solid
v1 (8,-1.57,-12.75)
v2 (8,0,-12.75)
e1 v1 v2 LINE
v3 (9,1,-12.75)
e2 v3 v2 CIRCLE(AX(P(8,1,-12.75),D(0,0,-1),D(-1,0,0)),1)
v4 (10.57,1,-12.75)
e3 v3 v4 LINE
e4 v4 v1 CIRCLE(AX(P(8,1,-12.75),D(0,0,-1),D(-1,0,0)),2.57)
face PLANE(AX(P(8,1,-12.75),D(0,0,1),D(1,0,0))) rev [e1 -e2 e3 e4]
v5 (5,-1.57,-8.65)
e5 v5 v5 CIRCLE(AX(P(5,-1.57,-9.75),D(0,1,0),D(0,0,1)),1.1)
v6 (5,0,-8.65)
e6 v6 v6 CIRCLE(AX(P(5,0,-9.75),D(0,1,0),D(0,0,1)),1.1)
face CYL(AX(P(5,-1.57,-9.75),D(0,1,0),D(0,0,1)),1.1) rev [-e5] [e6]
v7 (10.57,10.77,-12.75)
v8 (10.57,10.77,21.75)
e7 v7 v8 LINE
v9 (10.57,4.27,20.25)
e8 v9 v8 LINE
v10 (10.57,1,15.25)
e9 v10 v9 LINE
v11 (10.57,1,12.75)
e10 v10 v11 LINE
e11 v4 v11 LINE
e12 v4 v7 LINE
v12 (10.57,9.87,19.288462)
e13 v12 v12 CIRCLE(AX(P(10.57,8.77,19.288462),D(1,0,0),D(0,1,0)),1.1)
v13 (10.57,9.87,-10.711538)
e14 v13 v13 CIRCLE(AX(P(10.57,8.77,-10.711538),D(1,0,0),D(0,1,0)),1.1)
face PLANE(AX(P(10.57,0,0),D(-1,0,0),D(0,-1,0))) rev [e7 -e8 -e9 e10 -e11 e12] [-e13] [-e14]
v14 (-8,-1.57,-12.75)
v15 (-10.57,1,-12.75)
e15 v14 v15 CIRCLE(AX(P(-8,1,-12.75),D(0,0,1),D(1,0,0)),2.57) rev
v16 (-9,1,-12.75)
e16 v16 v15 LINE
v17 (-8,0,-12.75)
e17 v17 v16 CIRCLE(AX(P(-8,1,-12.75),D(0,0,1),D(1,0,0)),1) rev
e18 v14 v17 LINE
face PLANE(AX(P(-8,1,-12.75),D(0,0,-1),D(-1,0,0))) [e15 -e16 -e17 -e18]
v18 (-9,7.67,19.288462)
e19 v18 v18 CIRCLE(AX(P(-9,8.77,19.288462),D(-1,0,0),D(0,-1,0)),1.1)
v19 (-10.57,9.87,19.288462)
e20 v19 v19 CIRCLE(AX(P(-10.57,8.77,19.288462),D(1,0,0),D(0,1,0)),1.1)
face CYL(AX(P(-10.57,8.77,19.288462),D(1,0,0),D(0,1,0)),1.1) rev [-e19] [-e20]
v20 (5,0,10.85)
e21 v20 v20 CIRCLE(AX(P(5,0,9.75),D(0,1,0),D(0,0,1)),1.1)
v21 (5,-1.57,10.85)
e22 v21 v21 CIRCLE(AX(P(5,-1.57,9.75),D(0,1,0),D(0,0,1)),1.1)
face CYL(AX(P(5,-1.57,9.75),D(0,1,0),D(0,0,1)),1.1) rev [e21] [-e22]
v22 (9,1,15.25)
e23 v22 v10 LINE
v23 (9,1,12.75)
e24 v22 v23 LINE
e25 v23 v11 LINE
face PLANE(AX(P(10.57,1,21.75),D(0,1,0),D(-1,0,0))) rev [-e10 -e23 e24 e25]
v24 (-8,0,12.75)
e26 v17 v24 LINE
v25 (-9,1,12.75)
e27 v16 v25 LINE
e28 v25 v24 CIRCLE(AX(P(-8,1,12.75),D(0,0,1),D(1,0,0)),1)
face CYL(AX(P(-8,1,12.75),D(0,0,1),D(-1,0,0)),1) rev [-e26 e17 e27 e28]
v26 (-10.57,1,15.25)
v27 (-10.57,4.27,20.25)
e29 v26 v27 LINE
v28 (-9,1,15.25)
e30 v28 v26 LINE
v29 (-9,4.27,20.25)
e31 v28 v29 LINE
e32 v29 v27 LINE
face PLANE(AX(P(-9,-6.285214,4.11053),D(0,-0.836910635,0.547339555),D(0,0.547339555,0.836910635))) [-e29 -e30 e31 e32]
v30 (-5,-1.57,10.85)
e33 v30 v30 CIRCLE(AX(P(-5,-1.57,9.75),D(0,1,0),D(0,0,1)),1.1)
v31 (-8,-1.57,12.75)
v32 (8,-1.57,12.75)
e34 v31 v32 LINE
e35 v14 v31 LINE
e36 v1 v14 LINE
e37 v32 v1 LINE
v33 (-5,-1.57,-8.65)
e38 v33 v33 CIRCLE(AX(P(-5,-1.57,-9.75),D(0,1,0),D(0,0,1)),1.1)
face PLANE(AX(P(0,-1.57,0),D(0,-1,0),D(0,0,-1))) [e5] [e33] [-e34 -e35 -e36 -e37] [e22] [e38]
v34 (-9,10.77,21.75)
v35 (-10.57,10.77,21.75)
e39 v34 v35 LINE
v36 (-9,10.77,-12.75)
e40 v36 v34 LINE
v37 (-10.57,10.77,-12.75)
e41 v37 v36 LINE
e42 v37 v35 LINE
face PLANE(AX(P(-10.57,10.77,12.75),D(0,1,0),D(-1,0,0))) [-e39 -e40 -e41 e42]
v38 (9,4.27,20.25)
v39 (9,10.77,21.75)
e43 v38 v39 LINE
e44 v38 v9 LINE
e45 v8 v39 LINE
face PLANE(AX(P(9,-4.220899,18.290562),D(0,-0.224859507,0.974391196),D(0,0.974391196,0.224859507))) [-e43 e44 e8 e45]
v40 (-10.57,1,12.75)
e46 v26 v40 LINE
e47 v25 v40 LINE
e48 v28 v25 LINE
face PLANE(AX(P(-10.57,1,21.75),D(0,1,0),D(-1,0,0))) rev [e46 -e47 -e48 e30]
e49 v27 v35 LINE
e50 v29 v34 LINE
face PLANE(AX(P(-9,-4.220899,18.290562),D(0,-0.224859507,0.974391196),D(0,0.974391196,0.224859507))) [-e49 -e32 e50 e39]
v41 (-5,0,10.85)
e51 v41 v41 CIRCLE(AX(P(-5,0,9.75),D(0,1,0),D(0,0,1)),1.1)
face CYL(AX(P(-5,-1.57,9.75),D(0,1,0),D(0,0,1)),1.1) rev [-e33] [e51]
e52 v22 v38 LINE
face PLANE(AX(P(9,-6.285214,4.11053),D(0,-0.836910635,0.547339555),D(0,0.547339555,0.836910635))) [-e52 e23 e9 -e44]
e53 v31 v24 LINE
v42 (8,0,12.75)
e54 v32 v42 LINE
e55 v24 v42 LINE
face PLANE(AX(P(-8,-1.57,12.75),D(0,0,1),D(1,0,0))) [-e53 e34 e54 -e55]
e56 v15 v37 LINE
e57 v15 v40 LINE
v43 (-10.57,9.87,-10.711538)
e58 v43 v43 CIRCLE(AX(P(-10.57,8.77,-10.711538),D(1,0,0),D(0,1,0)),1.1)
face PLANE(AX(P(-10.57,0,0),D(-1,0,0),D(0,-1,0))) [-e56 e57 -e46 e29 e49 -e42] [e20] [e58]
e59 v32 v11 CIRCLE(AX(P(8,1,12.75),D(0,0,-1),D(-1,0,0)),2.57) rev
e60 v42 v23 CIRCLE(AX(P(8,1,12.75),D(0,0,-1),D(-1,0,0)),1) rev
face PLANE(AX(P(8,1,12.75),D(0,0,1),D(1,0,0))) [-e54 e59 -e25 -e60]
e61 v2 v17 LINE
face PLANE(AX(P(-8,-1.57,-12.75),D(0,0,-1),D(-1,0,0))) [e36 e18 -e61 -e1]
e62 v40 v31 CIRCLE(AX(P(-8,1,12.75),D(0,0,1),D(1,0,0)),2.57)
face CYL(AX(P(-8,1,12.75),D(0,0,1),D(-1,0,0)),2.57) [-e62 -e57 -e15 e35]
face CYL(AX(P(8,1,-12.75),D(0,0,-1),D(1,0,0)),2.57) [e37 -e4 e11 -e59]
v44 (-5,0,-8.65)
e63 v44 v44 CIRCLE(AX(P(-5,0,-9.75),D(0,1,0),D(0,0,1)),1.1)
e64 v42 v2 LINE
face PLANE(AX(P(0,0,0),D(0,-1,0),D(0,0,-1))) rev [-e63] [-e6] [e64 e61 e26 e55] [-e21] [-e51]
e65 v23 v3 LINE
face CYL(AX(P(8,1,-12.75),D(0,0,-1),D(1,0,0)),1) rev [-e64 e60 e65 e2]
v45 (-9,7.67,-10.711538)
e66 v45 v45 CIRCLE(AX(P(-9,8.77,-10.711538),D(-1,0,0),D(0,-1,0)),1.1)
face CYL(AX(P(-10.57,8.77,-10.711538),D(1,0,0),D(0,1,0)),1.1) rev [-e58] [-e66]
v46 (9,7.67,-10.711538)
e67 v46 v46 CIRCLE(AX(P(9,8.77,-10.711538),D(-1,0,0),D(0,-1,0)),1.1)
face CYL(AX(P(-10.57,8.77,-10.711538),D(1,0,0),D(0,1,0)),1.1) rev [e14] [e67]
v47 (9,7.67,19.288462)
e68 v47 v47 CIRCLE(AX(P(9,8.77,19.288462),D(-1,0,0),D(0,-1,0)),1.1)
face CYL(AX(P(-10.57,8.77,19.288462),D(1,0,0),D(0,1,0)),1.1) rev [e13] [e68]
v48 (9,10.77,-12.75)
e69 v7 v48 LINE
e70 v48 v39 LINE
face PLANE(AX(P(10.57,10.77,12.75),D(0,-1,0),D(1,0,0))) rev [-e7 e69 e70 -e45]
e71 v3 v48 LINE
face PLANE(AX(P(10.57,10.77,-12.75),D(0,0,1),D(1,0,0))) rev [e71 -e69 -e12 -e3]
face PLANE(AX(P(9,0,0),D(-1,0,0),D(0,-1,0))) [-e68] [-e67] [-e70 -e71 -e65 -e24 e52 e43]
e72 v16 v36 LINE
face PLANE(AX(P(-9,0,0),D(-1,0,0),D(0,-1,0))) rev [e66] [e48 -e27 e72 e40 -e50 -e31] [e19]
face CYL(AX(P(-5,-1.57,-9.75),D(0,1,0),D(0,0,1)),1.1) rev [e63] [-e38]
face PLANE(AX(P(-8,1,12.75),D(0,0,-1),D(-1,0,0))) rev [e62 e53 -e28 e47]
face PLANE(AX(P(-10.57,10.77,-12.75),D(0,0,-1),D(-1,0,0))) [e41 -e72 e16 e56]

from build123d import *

# Parameters (mm, degrees)
SKETCH1_W           = 16
SKETCH1_H           = 25.5
SKETCH1_R           = 1.1
BASE_FLANGE1_DEPTH  = 1.57
EDGE_FLANGE2_DEPTH  = 25.5
EDGE_FLANGE3_DEPTH  = 25.5
SKETCH23_W          = 1.57
SKETCH23_H          = 9.77
BOSS_EXTRUDE1_DEPTH = 9
CUT_EXTRUDE1_DEPTH  = 33.18625483
SKETCH29_R          = 1.1
CUT_EXTRUDE2_DEPTH  = 33.18625483


# Sheet-metal steps are written as plain solids
with BuildPart() as part:
    # Sketch1 → Base-Flange1 (new body)
    with BuildSketch(Plane(origin=(0, 0, 0), x_dir=(1, 0, 0), z_dir=(0, 1, 0))):
        Rectangle(SKETCH1_W, SKETCH1_H)
        with Locations(Location((-5, 9.75, 0), (0, 0, 270))):
            Circle(SKETCH1_R, mode=Mode.SUBTRACT)
        with Locations(Location((5, 9.75, 0), (0, 0, 270))):
            Circle(SKETCH1_R, mode=Mode.SUBTRACT)
        with Locations(Location((-5, -9.75, 0), (0, 0, 270))):
            Circle(SKETCH1_R, mode=Mode.SUBTRACT)
        with Locations(Location((5, -9.75, 0), (0, 0, 270))):
            Circle(SKETCH1_R, mode=Mode.SUBTRACT)
    extrude(amount=-BASE_FLANGE1_DEPTH)

    # Edge-Flange2 section (across the edge) → Edge-Flange2 (add)
    with BuildSketch(Plane(origin=(9, 0, 12.75), x_dir=(-1, 0, 0), z_dir=(0, 0, -1))):
        with BuildLine():
            Line((-1.57, 1), (-1.57, 10.77))
            Line((-1.57, 10.77), (0, 10.77))
            Line((0, 10.77), (0, 1))
            ThreePointArc((0, 1), (0.292893219, 0.292893219), (1, 0))
            Line((1, 0), (1, -1.57))
            ThreePointArc((1, -1.57), (-0.817264428, -0.817264428), (-1.57, 1))
        make_face()
    extrude(amount=EDGE_FLANGE2_DEPTH)

    # Edge-Flange3 section (across the edge) → Edge-Flange3 (add)
    with BuildSketch(Plane(origin=(-9, 0, -12.75), x_dir=(1, 0, 0), z_dir=(0, 0, 1))):
        with BuildLine():
            Line((-1.57, 1), (-1.57, 10.77))
            Line((-1.57, 10.77), (0, 10.77))
            Line((0, 10.77), (0, 1))
            ThreePointArc((0, 1), (0.292893219, 0.292893219), (1, 0))
            Line((1, 0), (1, -1.57))
            ThreePointArc((1, -1.57), (-0.817264428, -0.817264428), (-1.57, 1))
        make_face()
    extrude(amount=EDGE_FLANGE3_DEPTH)

    # Sketch23 → Boss-Extrude1 (add)
    with BuildSketch(Plane.XY.offset(12.75)):
        with Locations((-9.785, 5.885)):
            Rectangle(SKETCH23_W, SKETCH23_H)
        with Locations((9.785, 5.885)):
            Rectangle(SKETCH23_W, SKETCH23_H)
    extrude(amount=BOSS_EXTRUDE1_DEPTH)

    # Sketch24 → Cut-Extrude1 (cut, through all)
    with BuildSketch(Plane(origin=(10.57, 0, 0), x_dir=(0, 0, -1), z_dir=(1, 0, 0))):
        Polygon((-21.75, 10.77), (-21.75, 1), (-15.25, 1), (-20.25, 4.27), align=None)
    extrude(amount=-CUT_EXTRUDE1_DEPTH, mode=Mode.SUBTRACT)

    # Sketch29 → Cut-Extrude2 (cut, through all)
    with BuildSketch(Plane(origin=(10.57, 0, 0), x_dir=(0, 0, -1), z_dir=(1, 0, 0))):
        with Locations(Location((-19.288461538, 8.77, 0), (0, 0, 90))):
            Circle(SKETCH29_R)
        with Locations(Location((10.711538462, 8.77, 0), (0, 0, 90))):
            Circle(SKETCH29_R)
    extrude(amount=-CUT_EXTRUDE2_DEPTH, mode=Mode.SUBTRACT)


solid = part.part
